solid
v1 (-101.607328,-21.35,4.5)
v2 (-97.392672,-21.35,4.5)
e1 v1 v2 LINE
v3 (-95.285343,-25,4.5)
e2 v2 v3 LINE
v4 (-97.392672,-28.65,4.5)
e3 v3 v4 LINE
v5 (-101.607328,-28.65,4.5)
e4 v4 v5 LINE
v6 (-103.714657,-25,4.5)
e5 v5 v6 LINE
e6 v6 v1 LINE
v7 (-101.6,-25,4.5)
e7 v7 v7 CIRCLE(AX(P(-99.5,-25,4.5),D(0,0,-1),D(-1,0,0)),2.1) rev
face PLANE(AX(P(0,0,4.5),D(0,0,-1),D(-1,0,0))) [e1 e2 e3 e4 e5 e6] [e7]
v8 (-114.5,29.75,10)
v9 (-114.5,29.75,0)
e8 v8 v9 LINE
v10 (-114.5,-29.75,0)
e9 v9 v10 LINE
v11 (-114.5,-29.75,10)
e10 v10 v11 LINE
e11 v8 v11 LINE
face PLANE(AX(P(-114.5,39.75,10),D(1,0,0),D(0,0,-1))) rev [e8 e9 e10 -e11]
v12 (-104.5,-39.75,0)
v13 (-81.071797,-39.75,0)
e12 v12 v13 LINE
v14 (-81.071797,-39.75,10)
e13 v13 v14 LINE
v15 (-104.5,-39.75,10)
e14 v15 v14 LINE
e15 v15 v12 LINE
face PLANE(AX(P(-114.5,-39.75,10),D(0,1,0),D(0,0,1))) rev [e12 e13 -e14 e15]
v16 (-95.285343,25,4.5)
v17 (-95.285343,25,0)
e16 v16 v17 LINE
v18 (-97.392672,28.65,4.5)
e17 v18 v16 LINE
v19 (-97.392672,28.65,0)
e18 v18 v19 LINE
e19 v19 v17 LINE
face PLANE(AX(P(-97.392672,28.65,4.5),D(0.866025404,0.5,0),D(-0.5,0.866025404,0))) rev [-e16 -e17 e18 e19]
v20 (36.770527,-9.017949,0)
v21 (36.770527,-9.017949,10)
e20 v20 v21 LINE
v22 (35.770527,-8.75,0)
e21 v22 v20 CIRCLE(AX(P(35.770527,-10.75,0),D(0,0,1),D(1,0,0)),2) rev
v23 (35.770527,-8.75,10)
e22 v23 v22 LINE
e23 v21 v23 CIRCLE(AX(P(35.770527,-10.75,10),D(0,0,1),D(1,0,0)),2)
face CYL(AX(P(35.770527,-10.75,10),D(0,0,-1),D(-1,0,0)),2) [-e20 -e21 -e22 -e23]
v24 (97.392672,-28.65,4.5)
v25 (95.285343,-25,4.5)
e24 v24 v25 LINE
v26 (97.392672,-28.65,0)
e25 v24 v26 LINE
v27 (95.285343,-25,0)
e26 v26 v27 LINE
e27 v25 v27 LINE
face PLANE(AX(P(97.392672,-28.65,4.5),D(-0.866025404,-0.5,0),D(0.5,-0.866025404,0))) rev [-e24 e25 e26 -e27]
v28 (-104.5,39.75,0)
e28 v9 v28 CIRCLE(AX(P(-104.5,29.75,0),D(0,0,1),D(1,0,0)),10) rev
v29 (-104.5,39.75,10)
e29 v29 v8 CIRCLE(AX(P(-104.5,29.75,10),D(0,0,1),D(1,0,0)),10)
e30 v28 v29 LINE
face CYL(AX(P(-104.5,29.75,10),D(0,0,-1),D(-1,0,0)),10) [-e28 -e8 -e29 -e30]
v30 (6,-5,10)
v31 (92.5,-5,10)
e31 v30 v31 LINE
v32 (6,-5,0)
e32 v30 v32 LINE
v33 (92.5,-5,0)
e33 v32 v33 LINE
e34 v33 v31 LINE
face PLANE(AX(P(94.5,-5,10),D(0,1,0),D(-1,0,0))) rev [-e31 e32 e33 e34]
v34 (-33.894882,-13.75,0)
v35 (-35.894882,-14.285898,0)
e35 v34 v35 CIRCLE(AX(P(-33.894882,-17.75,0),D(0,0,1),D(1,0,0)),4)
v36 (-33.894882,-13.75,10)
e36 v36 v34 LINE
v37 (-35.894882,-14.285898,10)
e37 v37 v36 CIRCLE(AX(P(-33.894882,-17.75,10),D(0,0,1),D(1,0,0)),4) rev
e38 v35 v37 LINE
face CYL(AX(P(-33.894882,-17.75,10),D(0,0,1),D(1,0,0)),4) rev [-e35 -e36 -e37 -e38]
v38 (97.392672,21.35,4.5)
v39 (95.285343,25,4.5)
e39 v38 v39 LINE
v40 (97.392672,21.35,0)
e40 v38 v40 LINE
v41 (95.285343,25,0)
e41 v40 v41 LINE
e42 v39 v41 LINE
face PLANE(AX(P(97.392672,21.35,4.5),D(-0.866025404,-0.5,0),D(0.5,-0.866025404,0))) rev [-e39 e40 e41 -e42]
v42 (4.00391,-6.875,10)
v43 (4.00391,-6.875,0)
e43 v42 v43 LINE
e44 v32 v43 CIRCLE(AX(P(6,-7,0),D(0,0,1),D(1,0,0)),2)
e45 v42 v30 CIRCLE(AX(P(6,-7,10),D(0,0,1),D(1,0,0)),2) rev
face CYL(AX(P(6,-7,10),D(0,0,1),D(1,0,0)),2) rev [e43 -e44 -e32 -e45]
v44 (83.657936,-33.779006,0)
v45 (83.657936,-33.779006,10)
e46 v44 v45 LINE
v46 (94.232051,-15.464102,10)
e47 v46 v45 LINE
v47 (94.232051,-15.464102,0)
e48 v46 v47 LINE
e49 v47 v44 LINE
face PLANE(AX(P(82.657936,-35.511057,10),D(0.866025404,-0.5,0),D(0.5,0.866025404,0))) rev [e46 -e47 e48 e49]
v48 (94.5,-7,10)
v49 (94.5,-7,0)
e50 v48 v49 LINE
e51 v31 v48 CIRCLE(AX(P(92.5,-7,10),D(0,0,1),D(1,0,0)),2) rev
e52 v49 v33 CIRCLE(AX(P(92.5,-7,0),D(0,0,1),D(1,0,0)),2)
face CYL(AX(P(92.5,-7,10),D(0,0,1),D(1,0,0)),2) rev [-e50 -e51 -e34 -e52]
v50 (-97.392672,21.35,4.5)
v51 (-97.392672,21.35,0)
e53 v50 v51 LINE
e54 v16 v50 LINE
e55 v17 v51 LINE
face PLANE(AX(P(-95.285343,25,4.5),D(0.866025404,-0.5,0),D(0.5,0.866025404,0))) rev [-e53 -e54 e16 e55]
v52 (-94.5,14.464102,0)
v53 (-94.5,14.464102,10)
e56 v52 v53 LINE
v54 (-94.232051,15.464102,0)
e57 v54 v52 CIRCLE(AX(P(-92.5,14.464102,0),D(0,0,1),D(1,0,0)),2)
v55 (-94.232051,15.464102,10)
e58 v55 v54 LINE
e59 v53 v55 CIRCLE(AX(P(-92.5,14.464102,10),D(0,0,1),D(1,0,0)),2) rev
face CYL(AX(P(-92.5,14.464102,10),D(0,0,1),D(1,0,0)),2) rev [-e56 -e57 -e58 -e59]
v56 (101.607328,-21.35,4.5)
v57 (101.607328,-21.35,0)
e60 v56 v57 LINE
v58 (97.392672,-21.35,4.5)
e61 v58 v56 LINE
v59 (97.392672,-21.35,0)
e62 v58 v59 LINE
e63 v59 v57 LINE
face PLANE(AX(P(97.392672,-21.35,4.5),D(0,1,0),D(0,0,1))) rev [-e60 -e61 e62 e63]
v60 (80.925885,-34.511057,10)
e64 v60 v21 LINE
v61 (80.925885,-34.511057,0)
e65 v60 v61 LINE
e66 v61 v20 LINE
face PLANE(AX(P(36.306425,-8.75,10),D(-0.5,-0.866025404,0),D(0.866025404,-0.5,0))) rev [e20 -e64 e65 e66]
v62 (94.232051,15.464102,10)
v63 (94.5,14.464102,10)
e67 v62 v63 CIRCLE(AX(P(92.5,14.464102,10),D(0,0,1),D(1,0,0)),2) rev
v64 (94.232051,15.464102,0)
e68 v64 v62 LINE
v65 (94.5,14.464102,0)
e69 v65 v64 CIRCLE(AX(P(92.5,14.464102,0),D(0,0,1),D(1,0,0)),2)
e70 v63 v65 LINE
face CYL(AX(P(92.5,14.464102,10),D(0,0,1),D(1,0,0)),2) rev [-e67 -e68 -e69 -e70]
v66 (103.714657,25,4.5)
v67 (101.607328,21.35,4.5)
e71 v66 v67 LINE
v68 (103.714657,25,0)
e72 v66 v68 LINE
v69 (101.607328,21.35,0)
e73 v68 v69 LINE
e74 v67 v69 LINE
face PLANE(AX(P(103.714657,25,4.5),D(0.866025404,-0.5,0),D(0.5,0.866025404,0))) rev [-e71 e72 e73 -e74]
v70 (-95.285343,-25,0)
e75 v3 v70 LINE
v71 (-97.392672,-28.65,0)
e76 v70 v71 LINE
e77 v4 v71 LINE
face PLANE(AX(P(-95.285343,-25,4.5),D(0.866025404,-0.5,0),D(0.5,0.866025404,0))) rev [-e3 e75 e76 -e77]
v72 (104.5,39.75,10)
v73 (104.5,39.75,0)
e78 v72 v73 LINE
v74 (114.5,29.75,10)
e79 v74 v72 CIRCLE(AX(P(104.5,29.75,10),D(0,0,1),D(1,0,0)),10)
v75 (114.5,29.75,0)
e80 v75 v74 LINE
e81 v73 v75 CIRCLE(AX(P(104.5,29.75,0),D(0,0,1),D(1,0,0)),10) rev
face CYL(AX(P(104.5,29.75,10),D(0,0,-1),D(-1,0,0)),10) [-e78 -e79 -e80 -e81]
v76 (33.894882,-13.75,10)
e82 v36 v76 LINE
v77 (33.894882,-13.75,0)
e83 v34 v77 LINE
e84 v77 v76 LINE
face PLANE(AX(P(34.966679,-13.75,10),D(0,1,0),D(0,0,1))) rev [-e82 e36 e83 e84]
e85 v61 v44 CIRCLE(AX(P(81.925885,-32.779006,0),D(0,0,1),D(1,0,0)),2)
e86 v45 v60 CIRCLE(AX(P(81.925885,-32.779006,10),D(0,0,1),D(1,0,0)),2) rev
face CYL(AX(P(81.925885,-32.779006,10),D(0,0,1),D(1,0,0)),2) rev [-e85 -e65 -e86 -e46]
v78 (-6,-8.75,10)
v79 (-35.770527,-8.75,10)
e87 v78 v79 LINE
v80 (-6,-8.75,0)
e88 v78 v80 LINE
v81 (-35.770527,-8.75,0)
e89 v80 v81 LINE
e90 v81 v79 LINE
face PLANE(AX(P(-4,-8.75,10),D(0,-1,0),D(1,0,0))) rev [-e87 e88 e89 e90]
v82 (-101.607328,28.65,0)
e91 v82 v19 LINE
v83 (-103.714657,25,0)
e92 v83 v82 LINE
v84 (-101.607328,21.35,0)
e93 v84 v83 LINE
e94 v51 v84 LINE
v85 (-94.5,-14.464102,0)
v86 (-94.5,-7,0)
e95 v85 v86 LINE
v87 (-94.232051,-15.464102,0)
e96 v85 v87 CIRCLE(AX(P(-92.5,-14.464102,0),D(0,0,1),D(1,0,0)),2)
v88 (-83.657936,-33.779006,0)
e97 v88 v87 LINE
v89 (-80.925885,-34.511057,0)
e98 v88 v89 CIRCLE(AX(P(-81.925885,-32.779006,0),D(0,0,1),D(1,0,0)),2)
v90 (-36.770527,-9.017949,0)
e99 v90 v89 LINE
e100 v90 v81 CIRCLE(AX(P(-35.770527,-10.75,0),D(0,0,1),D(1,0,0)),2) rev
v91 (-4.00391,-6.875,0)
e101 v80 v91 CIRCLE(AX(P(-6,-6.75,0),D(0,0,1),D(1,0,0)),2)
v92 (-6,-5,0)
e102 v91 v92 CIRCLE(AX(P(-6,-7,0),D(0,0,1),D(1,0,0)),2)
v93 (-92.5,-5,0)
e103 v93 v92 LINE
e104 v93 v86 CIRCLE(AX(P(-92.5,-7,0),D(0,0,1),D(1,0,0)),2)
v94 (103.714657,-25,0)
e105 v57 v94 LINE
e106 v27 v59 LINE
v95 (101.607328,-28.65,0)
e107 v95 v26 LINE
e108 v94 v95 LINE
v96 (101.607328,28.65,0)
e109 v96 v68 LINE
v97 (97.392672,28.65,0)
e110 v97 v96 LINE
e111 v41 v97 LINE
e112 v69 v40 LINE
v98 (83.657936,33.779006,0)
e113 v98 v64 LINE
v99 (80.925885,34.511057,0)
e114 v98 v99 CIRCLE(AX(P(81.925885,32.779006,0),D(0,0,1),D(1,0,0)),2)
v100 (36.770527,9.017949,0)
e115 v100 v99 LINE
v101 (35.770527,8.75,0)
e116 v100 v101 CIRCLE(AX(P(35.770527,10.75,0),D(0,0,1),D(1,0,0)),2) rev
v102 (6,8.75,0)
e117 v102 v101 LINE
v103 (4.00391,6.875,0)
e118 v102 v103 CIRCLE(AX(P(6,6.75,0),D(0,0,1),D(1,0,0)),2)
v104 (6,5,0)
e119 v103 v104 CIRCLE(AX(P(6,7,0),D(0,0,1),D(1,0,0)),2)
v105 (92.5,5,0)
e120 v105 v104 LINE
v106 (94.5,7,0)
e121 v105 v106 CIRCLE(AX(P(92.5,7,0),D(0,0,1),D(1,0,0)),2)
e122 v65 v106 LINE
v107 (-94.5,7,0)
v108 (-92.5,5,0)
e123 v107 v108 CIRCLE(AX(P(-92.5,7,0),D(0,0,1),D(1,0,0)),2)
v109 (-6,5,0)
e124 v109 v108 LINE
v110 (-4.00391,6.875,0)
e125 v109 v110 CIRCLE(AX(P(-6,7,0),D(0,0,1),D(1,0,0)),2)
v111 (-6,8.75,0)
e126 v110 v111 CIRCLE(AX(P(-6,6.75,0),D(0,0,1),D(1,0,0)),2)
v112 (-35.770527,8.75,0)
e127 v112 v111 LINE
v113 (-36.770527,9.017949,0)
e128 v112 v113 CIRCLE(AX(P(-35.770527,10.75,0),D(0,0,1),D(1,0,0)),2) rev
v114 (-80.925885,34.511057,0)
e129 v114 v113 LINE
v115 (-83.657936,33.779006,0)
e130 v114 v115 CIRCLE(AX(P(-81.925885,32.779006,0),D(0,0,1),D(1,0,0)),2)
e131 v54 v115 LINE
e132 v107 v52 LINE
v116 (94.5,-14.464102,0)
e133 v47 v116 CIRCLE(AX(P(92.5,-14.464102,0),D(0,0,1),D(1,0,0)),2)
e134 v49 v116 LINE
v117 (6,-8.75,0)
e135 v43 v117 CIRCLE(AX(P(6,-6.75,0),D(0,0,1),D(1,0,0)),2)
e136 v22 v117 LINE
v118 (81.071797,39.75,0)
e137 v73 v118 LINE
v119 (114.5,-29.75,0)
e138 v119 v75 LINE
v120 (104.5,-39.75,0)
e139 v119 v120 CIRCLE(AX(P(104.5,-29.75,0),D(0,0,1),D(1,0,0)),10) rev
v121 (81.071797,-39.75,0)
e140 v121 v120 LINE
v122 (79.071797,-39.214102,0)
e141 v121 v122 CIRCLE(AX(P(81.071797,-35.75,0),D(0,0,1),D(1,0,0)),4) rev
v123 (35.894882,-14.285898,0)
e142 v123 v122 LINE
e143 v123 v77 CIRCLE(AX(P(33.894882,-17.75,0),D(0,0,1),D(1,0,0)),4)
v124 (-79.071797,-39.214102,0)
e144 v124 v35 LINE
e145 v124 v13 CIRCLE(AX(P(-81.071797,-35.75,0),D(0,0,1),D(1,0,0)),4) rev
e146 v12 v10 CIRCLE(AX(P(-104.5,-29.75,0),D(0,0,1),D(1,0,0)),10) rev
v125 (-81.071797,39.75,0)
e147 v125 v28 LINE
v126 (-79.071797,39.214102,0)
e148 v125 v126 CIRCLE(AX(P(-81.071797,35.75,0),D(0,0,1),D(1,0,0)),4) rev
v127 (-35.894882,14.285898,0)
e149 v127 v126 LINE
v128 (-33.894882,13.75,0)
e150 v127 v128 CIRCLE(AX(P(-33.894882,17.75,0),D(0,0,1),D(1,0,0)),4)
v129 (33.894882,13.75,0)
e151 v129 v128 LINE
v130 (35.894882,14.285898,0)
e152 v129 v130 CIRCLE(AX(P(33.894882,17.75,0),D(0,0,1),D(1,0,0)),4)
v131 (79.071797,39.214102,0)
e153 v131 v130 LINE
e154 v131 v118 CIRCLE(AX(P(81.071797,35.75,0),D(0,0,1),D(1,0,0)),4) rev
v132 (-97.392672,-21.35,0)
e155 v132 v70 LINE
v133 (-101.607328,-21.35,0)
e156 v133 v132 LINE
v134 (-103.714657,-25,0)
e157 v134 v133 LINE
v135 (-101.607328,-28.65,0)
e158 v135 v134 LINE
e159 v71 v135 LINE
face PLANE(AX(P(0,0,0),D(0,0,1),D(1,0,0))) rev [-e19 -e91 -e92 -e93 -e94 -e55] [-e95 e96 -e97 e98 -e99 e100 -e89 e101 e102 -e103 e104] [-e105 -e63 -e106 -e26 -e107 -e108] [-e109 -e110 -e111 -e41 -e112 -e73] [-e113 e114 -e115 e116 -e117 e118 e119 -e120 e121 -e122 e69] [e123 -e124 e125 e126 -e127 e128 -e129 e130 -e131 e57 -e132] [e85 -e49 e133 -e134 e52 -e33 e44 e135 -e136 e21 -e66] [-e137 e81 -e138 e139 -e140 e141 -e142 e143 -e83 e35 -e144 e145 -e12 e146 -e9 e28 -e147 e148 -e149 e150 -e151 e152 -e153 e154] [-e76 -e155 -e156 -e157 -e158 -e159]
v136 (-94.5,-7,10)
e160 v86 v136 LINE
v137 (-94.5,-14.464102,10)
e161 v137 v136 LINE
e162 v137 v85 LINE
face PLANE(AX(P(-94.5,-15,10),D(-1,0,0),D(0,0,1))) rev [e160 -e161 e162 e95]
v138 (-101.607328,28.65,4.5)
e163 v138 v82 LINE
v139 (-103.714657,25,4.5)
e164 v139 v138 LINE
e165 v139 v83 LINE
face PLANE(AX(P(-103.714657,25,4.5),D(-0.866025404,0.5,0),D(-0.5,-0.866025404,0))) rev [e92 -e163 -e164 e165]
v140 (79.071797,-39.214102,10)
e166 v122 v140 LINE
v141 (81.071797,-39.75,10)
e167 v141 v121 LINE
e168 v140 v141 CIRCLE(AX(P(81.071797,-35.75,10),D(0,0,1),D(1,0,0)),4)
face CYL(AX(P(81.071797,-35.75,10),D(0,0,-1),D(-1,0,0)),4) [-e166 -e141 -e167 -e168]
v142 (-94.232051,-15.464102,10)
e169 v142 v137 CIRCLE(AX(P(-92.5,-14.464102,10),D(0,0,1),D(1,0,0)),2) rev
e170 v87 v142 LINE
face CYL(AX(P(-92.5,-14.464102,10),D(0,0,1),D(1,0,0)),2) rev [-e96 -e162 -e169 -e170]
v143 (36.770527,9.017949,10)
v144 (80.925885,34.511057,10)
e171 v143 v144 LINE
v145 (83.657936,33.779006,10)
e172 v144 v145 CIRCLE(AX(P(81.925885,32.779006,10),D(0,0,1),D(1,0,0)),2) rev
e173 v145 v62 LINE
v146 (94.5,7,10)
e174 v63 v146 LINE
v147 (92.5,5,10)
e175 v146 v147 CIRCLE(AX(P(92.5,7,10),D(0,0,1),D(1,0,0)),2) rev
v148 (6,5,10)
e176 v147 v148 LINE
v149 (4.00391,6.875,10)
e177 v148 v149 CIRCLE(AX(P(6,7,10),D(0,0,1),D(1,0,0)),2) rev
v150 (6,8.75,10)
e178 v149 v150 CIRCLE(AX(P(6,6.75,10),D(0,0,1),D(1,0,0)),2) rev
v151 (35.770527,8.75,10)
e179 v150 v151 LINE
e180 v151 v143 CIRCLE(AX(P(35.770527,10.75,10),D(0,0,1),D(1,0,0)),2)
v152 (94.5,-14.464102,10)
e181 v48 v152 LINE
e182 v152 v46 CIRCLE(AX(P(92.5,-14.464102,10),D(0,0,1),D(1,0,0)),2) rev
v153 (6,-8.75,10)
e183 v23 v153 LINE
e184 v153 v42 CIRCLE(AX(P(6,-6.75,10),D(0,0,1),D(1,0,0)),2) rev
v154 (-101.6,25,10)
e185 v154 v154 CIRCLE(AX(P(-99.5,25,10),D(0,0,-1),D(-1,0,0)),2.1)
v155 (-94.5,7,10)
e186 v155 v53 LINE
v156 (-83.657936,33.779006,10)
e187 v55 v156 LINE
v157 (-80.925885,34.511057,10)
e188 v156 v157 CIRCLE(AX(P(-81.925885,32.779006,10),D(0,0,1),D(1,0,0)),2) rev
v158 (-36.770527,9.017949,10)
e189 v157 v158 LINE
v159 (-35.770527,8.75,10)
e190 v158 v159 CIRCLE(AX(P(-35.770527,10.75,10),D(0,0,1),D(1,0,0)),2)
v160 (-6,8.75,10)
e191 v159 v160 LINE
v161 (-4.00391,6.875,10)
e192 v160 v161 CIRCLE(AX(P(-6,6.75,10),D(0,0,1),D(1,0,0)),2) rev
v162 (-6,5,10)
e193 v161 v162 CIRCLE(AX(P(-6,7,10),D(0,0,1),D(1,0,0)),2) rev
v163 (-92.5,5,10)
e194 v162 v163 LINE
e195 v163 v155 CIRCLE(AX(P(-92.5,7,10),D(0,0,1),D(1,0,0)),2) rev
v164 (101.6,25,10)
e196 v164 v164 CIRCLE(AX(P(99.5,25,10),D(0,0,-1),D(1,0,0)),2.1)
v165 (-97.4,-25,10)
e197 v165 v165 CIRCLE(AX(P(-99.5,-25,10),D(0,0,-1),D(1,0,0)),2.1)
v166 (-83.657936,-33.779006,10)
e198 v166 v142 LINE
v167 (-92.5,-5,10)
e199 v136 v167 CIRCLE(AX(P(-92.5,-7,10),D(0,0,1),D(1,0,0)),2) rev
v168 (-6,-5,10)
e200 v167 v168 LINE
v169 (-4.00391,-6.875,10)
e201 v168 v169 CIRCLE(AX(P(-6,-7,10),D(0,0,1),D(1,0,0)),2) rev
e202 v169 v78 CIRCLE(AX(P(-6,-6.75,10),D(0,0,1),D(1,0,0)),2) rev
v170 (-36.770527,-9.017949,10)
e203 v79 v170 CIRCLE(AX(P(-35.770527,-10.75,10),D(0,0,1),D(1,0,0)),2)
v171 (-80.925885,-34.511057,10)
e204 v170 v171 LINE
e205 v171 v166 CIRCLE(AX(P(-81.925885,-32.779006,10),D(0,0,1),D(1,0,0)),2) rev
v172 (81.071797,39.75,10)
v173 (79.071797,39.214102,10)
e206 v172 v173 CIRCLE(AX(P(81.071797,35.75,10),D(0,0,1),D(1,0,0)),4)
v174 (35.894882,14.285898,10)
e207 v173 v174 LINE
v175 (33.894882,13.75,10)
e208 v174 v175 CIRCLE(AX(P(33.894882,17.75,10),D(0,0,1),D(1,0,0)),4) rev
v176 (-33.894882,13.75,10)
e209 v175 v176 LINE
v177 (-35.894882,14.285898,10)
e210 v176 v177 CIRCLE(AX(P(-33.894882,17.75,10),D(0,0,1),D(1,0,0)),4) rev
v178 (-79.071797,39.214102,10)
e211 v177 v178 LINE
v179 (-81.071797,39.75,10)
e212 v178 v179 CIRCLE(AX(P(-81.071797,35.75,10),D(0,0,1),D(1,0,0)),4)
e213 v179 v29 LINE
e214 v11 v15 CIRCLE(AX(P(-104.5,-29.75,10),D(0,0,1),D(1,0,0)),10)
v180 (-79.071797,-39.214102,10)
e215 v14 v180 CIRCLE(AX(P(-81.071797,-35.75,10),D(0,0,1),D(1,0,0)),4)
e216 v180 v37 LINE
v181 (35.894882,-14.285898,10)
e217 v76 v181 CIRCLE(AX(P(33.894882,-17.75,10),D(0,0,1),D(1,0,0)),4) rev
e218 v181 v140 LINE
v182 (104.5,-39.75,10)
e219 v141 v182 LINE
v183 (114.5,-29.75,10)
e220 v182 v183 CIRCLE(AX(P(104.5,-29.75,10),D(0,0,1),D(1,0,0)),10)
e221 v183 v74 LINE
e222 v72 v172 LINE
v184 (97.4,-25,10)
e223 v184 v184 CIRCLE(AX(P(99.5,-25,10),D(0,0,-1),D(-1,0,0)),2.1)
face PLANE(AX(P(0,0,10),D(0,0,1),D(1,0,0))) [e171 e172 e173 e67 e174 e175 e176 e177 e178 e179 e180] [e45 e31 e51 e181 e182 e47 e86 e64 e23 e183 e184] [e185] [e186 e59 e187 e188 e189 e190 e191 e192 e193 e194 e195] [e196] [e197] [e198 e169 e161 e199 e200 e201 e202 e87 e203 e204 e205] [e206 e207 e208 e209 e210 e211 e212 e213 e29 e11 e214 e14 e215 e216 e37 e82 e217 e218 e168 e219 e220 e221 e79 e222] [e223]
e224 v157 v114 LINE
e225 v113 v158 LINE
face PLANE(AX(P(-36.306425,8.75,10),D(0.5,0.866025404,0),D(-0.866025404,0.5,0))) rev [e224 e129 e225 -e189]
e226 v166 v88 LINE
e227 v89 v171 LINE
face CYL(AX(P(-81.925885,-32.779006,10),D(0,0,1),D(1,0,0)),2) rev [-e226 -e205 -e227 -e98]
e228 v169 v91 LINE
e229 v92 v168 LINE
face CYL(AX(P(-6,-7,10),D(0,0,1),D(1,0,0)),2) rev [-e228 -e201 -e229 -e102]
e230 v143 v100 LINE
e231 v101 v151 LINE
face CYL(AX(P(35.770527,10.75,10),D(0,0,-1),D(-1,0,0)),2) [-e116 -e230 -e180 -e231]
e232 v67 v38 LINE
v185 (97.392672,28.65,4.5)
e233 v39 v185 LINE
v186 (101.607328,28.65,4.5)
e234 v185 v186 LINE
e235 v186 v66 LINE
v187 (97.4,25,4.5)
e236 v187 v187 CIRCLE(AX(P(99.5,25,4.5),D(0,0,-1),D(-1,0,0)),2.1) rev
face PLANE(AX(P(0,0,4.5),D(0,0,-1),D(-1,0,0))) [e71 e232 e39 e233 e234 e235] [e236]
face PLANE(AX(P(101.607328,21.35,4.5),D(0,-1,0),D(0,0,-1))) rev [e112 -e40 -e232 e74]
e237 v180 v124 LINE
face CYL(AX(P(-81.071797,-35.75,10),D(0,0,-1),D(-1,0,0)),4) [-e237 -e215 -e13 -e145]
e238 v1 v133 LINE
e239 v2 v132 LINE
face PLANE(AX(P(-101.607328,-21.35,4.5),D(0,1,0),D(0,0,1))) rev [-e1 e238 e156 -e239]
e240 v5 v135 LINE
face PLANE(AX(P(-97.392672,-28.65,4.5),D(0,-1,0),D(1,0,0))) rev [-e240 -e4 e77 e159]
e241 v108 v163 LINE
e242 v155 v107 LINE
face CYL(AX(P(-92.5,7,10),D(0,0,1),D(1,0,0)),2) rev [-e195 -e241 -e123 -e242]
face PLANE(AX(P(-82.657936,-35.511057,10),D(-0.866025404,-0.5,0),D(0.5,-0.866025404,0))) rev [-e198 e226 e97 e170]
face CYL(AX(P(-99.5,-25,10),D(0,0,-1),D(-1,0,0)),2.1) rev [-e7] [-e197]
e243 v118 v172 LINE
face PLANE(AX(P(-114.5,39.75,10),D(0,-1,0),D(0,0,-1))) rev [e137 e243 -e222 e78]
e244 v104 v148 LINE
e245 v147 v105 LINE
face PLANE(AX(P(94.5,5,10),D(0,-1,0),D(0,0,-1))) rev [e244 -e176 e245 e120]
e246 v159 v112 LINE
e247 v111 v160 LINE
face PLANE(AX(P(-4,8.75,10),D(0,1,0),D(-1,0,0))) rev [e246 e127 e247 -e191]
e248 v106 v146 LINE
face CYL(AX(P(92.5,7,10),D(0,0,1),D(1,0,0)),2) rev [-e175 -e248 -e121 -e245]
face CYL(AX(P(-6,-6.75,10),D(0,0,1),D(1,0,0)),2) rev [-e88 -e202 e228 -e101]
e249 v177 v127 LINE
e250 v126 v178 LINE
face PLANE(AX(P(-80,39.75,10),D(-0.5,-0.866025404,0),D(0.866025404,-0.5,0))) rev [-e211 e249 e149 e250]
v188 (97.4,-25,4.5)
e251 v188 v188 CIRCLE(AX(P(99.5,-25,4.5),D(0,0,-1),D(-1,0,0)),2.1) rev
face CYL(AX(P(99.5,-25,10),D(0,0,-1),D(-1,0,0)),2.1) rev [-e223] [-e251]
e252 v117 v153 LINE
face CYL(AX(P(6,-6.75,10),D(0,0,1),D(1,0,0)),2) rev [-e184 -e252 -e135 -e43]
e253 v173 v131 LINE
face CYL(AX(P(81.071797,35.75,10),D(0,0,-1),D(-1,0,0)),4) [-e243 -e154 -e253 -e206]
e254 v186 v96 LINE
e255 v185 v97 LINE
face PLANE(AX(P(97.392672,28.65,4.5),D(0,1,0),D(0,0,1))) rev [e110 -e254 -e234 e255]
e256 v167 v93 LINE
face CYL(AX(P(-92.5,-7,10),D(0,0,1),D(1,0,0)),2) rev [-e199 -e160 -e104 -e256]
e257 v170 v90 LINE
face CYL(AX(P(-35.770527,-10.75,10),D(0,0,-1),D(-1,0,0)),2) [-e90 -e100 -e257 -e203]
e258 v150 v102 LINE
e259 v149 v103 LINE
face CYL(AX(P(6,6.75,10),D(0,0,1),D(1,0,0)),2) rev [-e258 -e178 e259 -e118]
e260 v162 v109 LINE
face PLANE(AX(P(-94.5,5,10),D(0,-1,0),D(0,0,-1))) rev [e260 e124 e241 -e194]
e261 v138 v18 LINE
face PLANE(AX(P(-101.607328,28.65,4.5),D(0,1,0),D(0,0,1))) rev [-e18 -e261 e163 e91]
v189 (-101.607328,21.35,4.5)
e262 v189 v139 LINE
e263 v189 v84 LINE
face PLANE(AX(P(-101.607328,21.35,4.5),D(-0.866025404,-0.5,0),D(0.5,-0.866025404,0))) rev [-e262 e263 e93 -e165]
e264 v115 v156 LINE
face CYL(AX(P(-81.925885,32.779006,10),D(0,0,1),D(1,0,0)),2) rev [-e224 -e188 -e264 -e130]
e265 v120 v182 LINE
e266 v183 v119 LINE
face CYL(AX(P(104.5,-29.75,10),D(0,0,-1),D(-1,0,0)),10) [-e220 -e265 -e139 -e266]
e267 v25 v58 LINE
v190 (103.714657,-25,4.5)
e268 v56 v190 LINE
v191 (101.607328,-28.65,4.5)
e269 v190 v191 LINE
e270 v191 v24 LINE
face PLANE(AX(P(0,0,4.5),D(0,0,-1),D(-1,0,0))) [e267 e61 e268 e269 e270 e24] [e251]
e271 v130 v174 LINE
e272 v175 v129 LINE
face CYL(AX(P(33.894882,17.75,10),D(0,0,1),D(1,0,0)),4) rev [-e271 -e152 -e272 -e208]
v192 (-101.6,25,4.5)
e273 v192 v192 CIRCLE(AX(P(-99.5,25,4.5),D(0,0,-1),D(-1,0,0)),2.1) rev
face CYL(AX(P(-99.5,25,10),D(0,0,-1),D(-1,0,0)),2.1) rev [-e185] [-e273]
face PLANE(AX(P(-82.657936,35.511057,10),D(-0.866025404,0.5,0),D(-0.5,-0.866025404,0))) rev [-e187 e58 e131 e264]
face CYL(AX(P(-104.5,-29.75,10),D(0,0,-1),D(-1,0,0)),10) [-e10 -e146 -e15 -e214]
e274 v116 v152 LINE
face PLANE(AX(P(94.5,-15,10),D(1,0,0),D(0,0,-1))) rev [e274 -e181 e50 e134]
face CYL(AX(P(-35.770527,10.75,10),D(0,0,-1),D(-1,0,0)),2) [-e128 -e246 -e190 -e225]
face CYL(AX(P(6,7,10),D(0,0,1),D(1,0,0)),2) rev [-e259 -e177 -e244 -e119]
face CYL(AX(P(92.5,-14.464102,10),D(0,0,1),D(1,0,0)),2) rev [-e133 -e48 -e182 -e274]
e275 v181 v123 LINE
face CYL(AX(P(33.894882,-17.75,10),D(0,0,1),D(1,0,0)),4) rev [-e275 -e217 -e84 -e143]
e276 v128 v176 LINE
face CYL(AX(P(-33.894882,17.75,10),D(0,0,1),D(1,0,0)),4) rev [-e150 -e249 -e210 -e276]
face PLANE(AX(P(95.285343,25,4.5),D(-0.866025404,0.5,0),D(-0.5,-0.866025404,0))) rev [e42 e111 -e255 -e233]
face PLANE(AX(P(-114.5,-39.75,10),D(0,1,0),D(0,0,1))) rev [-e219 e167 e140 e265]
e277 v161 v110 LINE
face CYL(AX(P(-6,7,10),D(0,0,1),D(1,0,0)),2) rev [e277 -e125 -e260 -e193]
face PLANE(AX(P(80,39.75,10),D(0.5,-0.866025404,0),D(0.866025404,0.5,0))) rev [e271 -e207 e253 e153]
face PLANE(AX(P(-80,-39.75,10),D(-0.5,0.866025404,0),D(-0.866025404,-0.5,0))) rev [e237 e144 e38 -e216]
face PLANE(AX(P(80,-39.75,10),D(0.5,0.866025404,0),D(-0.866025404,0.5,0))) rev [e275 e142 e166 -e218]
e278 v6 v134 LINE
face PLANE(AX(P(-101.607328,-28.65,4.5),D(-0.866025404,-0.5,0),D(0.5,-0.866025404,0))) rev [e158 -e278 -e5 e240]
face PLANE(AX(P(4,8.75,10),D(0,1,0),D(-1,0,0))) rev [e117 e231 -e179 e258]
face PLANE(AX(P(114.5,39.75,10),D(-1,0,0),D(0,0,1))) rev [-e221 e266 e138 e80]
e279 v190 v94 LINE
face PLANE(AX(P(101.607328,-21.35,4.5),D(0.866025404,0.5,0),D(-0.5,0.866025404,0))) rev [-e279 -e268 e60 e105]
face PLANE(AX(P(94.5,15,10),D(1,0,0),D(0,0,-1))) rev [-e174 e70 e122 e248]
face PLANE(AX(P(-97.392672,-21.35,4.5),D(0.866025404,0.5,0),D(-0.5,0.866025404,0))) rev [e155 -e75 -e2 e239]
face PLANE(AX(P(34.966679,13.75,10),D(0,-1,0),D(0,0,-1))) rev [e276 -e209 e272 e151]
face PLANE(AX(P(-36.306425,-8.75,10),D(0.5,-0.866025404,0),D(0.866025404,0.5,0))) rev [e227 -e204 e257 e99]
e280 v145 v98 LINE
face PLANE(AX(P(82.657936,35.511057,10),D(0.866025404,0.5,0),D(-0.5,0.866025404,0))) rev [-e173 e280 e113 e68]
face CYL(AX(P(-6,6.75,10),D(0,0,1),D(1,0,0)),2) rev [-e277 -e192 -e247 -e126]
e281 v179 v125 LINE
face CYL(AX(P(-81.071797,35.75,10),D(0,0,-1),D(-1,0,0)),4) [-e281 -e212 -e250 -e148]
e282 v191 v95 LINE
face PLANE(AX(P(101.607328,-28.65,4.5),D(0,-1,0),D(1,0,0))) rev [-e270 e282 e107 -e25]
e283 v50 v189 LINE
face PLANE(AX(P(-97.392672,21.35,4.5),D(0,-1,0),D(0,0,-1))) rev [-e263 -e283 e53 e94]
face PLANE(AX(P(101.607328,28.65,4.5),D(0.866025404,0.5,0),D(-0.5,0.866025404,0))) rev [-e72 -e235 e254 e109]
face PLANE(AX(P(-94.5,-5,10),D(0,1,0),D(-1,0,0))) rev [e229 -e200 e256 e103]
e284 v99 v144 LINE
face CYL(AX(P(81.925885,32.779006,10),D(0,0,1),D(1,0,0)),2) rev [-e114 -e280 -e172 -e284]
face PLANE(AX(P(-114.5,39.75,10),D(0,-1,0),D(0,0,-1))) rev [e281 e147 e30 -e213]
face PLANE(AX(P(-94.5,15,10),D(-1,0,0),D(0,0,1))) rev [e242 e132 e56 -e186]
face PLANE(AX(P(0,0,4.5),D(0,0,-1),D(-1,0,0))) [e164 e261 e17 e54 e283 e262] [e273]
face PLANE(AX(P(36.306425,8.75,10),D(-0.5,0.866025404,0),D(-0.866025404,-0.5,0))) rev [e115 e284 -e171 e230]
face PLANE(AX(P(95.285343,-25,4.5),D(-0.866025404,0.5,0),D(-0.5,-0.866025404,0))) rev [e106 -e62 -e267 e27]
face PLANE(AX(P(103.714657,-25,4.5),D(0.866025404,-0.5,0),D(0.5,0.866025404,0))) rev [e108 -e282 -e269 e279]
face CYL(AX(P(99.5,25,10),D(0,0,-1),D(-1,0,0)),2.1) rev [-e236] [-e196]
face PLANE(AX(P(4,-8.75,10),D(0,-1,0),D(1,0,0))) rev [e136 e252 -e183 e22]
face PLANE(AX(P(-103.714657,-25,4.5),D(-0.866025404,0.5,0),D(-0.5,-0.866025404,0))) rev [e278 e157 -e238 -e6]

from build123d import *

# Parameters (mm, degrees)
SKETCH_1_W          = 229
SKETCH_1_H          = 79.5
EXTRUDE_1_DEPTH     = 10
FILLET_1_R          = 10
SKETCH_2_R          = 2.1
CUT_EXTRUDE_1_DEPTH = 122.615428709
CUT_EXTRUDE_2_DEPTH = 4.5
CUT_EXTRUDE_3_DEPTH = 122.615428709
FILLET_2_R          = 4
CUT_EXTRUDE_4_DEPTH = 122.615428709
FILLET_3_R          = 2


with BuildPart() as part:
    # 草图1 → 凸台-拉伸1 (new body)
    with BuildSketch(Plane.XY):
        Rectangle(SKETCH_1_W, SKETCH_1_H)
    extrude(amount=EXTRUDE_1_DEPTH)

    # 圆角1
    fillet_1_edges = [part.edges().sort_by_distance(p)[0] for p in [
        (114.5, -39.75, 5),
        (-114.5, -39.75, 5),
        (-114.5, 39.75, 5),
        (114.5, 39.75, 5),
    ]]
    fillet(fillet_1_edges, radius=FILLET_1_R)

    # 草图2 → 切除-拉伸1 (cut, through all)
    with BuildSketch(Plane(origin=(0, 0, 0), x_dir=(-1, 0, 0), z_dir=(0, 0, -1))):
        with Locations((99.5, 25)):
            Circle(SKETCH_2_R)
        with Locations(Location((99.5, -25, 0), (0, 0, 180))):
            Circle(SKETCH_2_R)
        with Locations((-99.5, -25)):
            Circle(SKETCH_2_R)
        with Locations(Location((-99.5, 25, 0), (0, 0, 180))):
            Circle(SKETCH_2_R)
    extrude(amount=-CUT_EXTRUDE_1_DEPTH, mode=Mode.SUBTRACT)

    # 草图3 → 切除-拉伸2 (cut)
    with BuildSketch(Plane(origin=(0, 0, 0), x_dir=(-1, 0, 0), z_dir=(0, 0, -1))):
        Polygon((-97.392671517, 21.35), (-95.285343035, 25), (-97.392671517, 28.65), (-101.607328483, 28.65), (-103.714656965, 25), (-101.607328483, 21.35), align=None)
        Polygon((-97.392671517, -28.65), (-95.285343035, -25), (-97.392671517, -21.35), (-101.607328483, -21.35), (-103.714656965, -25), (-101.607328483, -28.65), align=None)
        Polygon((101.607328483, 21.35), (103.714656965, 25), (101.607328483, 28.65), (97.392671517, 28.65), (95.285343035, 25), (97.392671517, 21.35), align=None)
        Polygon((101.607328483, -28.65), (103.714656965, -25), (101.607328483, -21.35), (97.392671517, -21.35), (95.285343035, -25), (97.392671517, -28.65), align=None)
    extrude(amount=-CUT_EXTRUDE_2_DEPTH, mode=Mode.SUBTRACT)

    # 草图4 → 切除-拉伸3 (cut, through all)
    with BuildSketch(Plane(origin=(0, 0, 0), x_dir=(-1, 0, 0), z_dir=(0, 0, -1))):
        Polygon((-80, 39.75), (-34.966679003, 13.75), (34.966679003, 13.75), (80, 39.75), align=None)
        Polygon((80, -39.75), (34.966679003, -13.75), (-34.966679003, -13.75), (-80, -39.75), align=None)
    extrude(amount=-CUT_EXTRUDE_3_DEPTH, mode=Mode.SUBTRACT)

    # 圆角2
    fillet_2_edges = [part.edges().sort_by_distance(p)[0] for p in [
        (80, 39.75, 5),
        (-80, 39.75, 5),
        (-34.966679003, 13.75, 5),
        (34.966679003, 13.75, 5),
        (-80, -39.75, 5),
        (80, -39.75, 5),
        (34.966679003, -13.75, 5),
        (-34.966679003, -13.75, 5),
    ]]
    fillet(fillet_2_edges, radius=FILLET_2_R)

    # 草图6 → 切除-拉伸4 (cut, through all)
    with BuildSketch(Plane(origin=(0, 0, 0), x_dir=(-1, 0, 0), z_dir=(0, 0, -1))):
        Polygon((-82.657935628, 35.511057159), (-94.5, 15), (-94.5, 5), (-4, 5), (-4, 8.75), (-36.306424965, 8.75), align=None)
        Polygon((36.306424965, 8.75), (82.657935628, 35.511057159), (94.5, 15), (94.5, 5), (4, 5), (4, 8.75), align=None)
        Polygon((82.657935628, -35.511057159), (94.5, -15), (94.5, -5), (4, -5), (4, -8.75), (36.306424965, -8.75), align=None)
        Polygon((-36.306424965, -8.75), (-82.657935628, -35.511057159), (-94.5, -15), (-94.5, -5), (-4, -5), (-4, -8.75), align=None)
    extrude(amount=-CUT_EXTRUDE_4_DEPTH, mode=Mode.SUBTRACT)

    # 圆角3
    # the kernel refuses this fillet: 2 mm, written as the material it adds along each edge
    with BuildSketch(Plane(origin=(4, 8.75, 0), x_dir=(0, -1, 0), z_dir=(0, 0, 1)), Plane(origin=(94.5, 5, 0), x_dir=(0, 1, 0), z_dir=(0, 0, 1)), Plane(origin=(4, 5, 0), x_dir=(1, 0, 0), z_dir=(0, 0, 1)), Plane(origin=(-82.657935628, 35.511057159, 0), x_dir=(-0.499999999999999, -0.8660254037844393, 0), z_dir=(0, 0, 1)), Plane(origin=(-4, 5, 0), x_dir=(0, 1, 0), z_dir=(0, 0, 1)), Plane(origin=(-4, 8.75, 0), x_dir=(-1, 0, 0), z_dir=(0, 0, 1)), Plane(origin=(-94.5, 5, 0), x_dir=(1, 0, 0), z_dir=(0, 0, 1)), Plane(origin=(82.657935628, -35.511057159, 0), x_dir=(0.5000000000000006, 0.8660254037844384, 0), z_dir=(0, 0, 1)), Plane(origin=(94.5, -5, 0), x_dir=(-1, 0, 0), z_dir=(0, 0, 1)), Plane(origin=(4, -5, 0), x_dir=(0, -1, 0), z_dir=(0, 0, 1)), Plane(origin=(4, -8.75, 0), x_dir=(1, 0, 0), z_dir=(0, 0, 1)), Plane(origin=(-4, -8.75, 0), x_dir=(0, 1, 0), z_dir=(0, 0, 1)), Plane(origin=(-4, -5, 0), x_dir=(-1, 0, 0), z_dir=(0, 0, 1)), Plane(origin=(-94.5, -5, 0), x_dir=(0, -1, 0), z_dir=(0, 0, 1))) as fillet_3_piece_1:
        with BuildLine():
            CenterArc((FILLET_3_R, FILLET_3_R), FILLET_3_R, 180, 90)
            Line((0, FILLET_3_R), (0, 0))
            Line((0, 0), (FILLET_3_R, 0))
        make_face()
    extrude(amount=10)
    with BuildSketch(Plane(origin=(94.5, 15, 0), x_dir=(-0.5000000000000042, 0.8660254037844363, 0), z_dir=(0, 0, 1)), Plane(origin=(-94.5, 15, 0), x_dir=(0, -1, 0), z_dir=(0, 0, 1)), Plane(origin=(94.5, -15, 0), x_dir=(0, 1, 0), z_dir=(0, 0, 1)), Plane(origin=(-94.5, -15, 0), x_dir=(0.49999999999999856, -0.8660254037844396, 0), z_dir=(0, 0, 1))) as fillet_3_piece_2:
        with BuildLine():
            CenterArc((FILLET_3_R * 0.267949192431, FILLET_3_R), FILLET_3_R, 240, 30)
            Line((-FILLET_3_R * 0.232050807569, FILLET_3_R * 0.133974596216), (0, 0))
            Line((0, 0), (FILLET_3_R * 0.267949192431, 0))
        make_face()
    extrude(amount=10)
    with BuildSketch(Plane(origin=(82.657935628, 35.511057159, 0), x_dir=(0.499999999999999, -0.8660254037844393, 0), z_dir=(0, 0, 1)), Plane(origin=(-82.657935628, -35.511057159, 0), x_dir=(-0.499999999999999, 0.8660254037844393, 0), z_dir=(0, 0, 1))) as fillet_3_piece_3:
        with BuildLine():
            CenterArc((FILLET_3_R, -FILLET_3_R), FILLET_3_R, 90, 90)
            Line((0, -FILLET_3_R), (0, 0))
            Line((0, 0), (FILLET_3_R, 0))
        make_face()
    extrude(amount=10)
    # the kernel refuses this fillet: 2 mm, written as the material it takes off along each edge
    with BuildSketch(Plane(origin=(36.306424965, 8.75, -1.339745962), x_dir=(-1, 0, 0), z_dir=(0, 0, 1)), Plane(origin=(-36.306424965, -8.75, -1.339745962), x_dir=(1, 0, 0), z_dir=(0, 0, 1))) as fillet_3_2_piece_1:
        with BuildLine():
            CenterArc((FILLET_3_R * 0.267949192431, -FILLET_3_R), FILLET_3_R, 90, 30)
            Line((-FILLET_3_R * 0.232050807569, -FILLET_3_R * 0.133974596216), (0, 0))
            Line((0, 0), (FILLET_3_R * 0.267949192431, 0))
        make_face()
    extrude(amount=12.679491924, mode=Mode.SUBTRACT)
    with BuildSketch(Plane(origin=(-36.306424965, 8.75, -1.339745962), x_dir=(1, 0, 0), z_dir=(0, 0, 1)), Plane(origin=(36.306424965, -8.75, -1.339745962), x_dir=(-1, 0, 0), z_dir=(0, 0, 1))) as fillet_3_2_piece_2:
        with BuildLine():
            CenterArc((FILLET_3_R * 0.267949192431, FILLET_3_R), FILLET_3_R, 240, 30)
            Line((-FILLET_3_R * 0.232050807569, FILLET_3_R * 0.133974596216), (0, 0))
            Line((0, 0), (FILLET_3_R * 0.267949192431, 0))
        make_face()
    extrude(amount=12.679491924, mode=Mode.SUBTRACT)


solid = part.part
